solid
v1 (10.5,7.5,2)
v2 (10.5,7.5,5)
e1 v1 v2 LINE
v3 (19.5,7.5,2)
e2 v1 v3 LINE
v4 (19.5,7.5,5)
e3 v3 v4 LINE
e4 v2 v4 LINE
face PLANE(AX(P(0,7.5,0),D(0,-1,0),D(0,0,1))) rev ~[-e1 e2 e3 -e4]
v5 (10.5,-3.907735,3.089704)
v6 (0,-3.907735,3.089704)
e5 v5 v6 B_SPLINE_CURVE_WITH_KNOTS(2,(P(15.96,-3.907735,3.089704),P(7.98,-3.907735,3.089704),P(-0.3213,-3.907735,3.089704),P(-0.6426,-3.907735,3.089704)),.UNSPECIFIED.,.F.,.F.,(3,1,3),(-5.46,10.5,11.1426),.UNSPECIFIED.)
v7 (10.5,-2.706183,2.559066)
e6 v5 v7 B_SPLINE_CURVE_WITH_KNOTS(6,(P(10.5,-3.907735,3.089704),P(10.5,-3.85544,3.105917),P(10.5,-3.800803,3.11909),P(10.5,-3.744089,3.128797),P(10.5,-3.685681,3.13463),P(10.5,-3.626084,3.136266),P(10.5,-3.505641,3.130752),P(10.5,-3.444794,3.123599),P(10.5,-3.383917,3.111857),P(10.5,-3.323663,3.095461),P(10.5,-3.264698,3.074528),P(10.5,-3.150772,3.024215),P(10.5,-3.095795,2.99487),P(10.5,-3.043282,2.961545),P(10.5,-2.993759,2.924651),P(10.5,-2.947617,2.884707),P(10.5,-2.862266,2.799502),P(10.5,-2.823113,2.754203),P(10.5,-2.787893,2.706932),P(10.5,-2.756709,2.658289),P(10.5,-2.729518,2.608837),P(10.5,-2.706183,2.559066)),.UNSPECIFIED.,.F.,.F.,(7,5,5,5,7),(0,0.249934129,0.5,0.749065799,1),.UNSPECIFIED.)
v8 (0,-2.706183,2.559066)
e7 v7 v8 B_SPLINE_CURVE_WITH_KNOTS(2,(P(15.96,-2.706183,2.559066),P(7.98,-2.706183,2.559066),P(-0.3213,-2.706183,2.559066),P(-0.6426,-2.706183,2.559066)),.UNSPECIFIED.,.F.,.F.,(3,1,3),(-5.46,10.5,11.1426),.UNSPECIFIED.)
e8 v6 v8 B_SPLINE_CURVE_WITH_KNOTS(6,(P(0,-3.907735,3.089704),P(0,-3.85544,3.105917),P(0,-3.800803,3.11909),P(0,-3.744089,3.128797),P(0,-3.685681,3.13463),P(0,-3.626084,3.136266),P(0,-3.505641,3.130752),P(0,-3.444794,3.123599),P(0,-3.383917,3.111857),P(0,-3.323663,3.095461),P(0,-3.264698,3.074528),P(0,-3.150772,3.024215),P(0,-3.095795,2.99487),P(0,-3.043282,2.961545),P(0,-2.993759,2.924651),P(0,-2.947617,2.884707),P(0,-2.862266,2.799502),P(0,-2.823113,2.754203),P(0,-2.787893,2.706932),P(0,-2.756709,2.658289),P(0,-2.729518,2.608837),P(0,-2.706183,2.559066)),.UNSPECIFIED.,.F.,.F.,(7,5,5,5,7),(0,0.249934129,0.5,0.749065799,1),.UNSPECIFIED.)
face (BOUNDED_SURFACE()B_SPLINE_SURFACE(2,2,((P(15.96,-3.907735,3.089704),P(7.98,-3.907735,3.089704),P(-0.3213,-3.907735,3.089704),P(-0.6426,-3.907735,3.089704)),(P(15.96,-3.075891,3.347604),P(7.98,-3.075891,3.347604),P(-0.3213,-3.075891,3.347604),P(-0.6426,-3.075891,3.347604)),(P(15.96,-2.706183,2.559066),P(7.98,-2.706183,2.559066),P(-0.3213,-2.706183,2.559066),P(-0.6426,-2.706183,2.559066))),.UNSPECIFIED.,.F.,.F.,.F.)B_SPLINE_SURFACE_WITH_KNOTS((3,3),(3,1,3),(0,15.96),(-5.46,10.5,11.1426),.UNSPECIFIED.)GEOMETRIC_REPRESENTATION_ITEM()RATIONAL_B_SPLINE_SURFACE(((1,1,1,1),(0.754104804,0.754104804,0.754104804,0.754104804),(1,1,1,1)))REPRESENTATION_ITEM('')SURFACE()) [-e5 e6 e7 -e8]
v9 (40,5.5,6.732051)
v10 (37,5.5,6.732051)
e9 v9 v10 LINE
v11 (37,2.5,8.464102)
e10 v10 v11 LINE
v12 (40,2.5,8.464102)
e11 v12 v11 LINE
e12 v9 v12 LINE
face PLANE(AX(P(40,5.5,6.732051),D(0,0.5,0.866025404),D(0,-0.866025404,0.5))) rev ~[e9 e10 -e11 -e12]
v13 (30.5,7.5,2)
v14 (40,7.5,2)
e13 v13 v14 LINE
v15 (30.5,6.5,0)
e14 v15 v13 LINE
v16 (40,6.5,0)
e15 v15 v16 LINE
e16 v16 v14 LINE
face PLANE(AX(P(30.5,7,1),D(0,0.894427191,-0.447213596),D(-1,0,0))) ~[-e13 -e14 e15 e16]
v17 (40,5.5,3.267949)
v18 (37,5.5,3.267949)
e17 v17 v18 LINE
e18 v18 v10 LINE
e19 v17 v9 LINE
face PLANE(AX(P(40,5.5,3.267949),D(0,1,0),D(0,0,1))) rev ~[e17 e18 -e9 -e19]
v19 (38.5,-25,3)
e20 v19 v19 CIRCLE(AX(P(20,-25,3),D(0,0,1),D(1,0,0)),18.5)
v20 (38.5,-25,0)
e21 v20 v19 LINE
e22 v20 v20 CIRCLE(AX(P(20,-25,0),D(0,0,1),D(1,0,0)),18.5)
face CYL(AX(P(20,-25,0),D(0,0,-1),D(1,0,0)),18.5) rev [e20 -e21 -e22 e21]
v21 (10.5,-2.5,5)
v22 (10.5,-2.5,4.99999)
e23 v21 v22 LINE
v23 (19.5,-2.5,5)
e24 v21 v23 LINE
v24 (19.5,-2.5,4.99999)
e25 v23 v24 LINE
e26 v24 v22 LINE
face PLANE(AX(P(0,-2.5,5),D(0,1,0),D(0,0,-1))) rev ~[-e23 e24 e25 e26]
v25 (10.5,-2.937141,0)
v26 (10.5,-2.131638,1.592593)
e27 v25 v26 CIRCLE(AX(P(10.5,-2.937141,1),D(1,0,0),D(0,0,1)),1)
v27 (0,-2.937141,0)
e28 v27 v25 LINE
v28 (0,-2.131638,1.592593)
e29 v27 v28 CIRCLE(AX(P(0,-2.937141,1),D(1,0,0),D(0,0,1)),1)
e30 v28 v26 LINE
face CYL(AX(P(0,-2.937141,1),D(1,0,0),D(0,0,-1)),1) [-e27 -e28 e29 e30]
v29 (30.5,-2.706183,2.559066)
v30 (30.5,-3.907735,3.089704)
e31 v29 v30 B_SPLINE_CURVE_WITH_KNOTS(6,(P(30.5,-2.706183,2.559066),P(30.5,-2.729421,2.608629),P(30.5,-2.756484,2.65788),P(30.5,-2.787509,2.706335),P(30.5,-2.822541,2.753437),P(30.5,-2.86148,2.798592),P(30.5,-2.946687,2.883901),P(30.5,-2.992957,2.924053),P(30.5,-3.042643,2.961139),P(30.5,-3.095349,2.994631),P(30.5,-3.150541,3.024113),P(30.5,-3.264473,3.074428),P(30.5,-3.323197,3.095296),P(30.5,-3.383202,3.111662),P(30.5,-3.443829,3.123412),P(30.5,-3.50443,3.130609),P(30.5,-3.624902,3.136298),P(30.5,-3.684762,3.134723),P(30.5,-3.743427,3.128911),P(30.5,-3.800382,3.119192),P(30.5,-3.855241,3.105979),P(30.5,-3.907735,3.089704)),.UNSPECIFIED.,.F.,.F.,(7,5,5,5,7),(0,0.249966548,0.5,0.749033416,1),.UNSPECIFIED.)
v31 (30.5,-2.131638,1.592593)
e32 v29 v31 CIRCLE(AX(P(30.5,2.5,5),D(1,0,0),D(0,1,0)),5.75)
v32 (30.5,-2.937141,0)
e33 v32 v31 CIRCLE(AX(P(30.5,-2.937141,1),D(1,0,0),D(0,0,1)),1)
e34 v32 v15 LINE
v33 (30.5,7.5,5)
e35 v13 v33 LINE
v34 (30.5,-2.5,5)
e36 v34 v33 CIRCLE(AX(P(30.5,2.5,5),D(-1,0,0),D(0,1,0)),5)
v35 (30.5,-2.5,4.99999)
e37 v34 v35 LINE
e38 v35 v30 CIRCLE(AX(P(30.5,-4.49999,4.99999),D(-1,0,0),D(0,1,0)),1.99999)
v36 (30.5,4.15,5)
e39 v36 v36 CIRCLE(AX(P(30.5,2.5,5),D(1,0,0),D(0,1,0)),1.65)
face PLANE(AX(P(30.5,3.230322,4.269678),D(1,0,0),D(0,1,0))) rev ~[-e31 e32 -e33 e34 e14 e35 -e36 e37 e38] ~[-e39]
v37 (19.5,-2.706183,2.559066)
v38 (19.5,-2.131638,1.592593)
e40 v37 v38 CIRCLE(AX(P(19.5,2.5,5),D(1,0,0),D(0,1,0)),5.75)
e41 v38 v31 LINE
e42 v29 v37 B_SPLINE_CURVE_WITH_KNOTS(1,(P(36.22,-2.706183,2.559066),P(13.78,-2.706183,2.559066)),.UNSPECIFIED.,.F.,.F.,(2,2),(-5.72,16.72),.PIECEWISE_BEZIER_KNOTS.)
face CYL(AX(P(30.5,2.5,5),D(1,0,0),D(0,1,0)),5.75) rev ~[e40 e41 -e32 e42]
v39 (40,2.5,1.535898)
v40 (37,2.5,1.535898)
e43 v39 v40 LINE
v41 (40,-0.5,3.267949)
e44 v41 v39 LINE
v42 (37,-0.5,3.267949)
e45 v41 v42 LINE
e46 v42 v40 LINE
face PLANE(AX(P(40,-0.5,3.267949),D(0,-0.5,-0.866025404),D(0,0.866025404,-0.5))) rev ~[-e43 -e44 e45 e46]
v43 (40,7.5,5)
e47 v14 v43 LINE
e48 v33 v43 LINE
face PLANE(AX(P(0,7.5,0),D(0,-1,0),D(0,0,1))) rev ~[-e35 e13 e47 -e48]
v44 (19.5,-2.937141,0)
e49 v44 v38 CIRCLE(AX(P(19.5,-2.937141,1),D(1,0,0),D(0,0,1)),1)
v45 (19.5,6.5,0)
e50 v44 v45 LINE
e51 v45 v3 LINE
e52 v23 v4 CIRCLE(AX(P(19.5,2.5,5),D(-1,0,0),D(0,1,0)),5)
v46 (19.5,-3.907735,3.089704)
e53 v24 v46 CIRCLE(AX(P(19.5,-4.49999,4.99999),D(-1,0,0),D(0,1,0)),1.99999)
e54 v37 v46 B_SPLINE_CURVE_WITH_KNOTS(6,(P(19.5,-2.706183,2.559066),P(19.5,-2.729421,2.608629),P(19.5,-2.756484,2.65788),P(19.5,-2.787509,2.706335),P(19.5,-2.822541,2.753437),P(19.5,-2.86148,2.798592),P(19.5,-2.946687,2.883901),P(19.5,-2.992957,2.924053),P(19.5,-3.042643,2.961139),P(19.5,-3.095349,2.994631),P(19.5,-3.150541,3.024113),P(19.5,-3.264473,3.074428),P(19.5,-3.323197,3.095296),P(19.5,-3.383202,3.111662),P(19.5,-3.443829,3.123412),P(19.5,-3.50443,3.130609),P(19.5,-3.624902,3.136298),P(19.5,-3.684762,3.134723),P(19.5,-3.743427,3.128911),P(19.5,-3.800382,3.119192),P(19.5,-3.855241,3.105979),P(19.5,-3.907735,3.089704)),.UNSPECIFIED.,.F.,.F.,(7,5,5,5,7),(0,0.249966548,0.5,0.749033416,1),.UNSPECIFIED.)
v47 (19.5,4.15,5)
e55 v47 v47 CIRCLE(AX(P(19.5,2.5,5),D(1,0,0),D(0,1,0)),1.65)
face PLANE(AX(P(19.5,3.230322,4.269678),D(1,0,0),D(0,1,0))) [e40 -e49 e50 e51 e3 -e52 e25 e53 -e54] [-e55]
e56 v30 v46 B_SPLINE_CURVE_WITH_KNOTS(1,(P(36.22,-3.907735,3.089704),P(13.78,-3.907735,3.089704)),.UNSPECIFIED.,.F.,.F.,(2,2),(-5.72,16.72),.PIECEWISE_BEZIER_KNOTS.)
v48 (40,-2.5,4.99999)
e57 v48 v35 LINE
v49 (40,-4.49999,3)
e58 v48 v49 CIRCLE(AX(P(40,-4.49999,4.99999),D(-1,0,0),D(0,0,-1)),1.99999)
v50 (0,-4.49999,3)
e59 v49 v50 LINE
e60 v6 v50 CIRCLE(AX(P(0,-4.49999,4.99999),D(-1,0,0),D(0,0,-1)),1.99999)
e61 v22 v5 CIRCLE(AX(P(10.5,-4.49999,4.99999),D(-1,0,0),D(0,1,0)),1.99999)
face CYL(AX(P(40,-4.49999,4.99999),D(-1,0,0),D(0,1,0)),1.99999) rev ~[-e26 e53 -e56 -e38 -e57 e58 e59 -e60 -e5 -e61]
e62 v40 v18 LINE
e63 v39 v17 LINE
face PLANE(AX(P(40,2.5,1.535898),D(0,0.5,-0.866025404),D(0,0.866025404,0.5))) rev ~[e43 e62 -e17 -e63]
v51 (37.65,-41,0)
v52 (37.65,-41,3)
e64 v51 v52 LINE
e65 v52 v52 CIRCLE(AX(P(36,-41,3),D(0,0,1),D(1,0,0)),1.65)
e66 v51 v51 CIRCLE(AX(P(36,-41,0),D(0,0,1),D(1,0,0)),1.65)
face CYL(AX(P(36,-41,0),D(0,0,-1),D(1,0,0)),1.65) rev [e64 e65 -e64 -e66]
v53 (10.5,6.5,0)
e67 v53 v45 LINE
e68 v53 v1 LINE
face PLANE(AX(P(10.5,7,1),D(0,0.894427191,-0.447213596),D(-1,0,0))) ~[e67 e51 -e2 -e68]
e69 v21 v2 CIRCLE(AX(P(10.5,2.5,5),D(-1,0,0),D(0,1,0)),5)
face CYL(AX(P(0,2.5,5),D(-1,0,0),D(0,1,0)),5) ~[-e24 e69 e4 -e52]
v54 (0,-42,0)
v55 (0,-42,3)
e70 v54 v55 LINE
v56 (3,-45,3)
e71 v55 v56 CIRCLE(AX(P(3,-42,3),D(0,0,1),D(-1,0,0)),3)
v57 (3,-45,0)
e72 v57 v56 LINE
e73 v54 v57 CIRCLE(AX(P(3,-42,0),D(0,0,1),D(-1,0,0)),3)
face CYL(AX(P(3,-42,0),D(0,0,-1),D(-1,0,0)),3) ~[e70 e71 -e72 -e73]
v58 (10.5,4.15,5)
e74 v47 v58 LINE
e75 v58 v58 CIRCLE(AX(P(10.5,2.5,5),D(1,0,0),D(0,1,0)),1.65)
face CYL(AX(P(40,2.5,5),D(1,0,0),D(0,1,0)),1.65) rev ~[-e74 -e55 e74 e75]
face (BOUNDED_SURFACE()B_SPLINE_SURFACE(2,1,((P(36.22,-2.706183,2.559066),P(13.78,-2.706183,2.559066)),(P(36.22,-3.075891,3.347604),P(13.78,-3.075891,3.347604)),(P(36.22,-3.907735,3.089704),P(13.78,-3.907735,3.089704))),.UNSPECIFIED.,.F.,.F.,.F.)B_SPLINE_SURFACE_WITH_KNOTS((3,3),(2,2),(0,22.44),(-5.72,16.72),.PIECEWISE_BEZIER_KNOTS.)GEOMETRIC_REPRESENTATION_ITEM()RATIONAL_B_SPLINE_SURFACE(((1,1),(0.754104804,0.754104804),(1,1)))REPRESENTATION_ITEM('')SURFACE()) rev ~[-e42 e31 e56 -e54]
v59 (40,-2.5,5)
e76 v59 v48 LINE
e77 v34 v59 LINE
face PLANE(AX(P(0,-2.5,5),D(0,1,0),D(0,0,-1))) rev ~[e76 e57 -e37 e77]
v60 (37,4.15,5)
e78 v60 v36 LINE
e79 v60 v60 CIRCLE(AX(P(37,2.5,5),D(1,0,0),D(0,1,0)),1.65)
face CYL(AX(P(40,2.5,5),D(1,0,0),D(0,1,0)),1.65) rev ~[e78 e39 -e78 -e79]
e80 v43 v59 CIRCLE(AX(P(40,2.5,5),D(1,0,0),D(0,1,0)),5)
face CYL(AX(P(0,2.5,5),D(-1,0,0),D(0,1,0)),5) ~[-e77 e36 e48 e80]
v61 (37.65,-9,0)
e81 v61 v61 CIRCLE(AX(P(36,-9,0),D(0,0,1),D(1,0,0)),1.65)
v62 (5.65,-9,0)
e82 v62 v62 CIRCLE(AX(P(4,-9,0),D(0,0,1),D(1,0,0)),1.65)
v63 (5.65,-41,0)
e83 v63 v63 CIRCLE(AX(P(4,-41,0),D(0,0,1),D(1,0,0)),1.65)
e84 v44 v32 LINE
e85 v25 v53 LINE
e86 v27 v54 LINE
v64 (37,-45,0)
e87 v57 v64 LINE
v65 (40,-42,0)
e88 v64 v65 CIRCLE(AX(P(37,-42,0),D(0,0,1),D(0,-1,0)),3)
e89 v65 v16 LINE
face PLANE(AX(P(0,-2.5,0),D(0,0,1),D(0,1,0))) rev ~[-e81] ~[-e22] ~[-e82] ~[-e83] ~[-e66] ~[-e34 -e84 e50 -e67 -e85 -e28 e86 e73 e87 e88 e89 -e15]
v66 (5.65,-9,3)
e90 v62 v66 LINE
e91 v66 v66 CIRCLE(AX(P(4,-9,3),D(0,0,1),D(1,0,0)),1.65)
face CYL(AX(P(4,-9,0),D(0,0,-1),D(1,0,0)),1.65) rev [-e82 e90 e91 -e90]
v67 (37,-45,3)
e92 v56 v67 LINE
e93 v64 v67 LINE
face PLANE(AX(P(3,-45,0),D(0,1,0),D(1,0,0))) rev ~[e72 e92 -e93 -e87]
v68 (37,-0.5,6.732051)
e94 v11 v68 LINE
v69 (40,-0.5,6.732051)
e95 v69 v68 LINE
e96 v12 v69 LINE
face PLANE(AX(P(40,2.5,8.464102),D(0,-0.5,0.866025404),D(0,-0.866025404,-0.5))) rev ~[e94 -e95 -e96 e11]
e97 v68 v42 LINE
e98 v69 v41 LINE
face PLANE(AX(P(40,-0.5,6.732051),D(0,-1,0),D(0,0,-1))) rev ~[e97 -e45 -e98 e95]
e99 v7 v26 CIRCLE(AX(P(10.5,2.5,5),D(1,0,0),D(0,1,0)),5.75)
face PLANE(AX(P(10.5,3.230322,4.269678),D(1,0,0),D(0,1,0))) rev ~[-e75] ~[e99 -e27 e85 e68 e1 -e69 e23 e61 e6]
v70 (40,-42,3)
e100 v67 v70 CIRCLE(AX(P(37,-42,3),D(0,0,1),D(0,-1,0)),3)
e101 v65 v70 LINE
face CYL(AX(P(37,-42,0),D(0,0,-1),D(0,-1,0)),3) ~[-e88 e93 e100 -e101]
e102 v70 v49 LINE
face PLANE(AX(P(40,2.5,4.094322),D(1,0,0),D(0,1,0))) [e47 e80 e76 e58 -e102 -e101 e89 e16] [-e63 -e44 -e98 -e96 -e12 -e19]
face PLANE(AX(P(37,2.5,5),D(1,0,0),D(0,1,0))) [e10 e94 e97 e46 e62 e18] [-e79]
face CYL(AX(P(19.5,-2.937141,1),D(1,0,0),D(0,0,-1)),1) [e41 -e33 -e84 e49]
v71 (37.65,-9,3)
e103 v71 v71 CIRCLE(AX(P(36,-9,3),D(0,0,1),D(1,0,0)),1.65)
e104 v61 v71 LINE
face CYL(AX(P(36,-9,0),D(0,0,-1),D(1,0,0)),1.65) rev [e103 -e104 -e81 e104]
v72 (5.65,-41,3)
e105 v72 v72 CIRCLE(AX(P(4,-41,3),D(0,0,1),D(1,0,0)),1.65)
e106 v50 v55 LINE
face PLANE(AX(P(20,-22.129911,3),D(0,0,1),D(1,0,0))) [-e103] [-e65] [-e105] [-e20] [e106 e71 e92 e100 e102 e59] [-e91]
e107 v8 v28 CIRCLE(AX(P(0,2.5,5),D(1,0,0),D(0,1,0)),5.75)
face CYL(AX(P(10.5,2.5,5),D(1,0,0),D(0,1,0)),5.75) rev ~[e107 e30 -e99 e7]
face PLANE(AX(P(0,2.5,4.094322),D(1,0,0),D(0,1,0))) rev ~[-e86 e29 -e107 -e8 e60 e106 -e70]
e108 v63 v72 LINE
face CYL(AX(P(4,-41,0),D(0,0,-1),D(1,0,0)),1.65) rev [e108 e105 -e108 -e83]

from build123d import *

# Parameters (mm, degrees)
F0_R      = 1.65
F0_R_2    = 18.5
F1_DEPTH  = 3
F3_DEPTH  = 40
F4_R      = 1.65
F5_DEPTH  = 40.001
F7_DEPTH  = 3
F8_R      = 1.99999
F11_DEPTH = 11
F14_DEPTH = 10.501
F15_SIZE2 = 2
F15_SIZE  = 1
F16_R     = 1


# Not quite as in the source:
# - a fillet or chamfer is up to 0.001 mm smaller than in the source, because OpenCascade refuses the exact size


with BuildPart() as f1:
    # F0 (on Top) → F1 (new body)
    with BuildSketch(Plane.XY):
        with BuildLine():
            Line((40, 0), (0, 0))
            Line((0, 0), (0, -42))
            ThreePointArc((0, -42), (0.8786796564, -44.1213203436), (3, -45))
            Line((3, -45), (37, -45))
            ThreePointArc((37, -45), (39.1213203436, -44.1213203436), (40, -42))
            Line((40, -42), (40, 0))
        make_face()
        with Locations((4, -41)):
            Circle(F0_R, mode=Mode.SUBTRACT)
        with Locations((36, -41)):
            Circle(F0_R, mode=Mode.SUBTRACT)
        with Locations((20, -25)):
            Circle(F0_R_2, mode=Mode.SUBTRACT)
        with Locations((4, -9)):
            Circle(F0_R, mode=Mode.SUBTRACT)
        with Locations((36, -9)):
            Circle(F0_R, mode=Mode.SUBTRACT)
    extrude(amount=F1_DEPTH)

    # F2 (on Right) → F3 (join)
    with BuildSketch(Plane.YZ):
        with BuildLine():
            Line((-2.5, 5), (-2.5, 0))
            Line((-2.5, 0), (7.5, 0))
            Line((7.5, 0), (7.5, 5))
            ThreePointArc((7.5, 5), (2.5, 10), (-2.5, 5))
        make_face()
    extrude(amount=F3_DEPTH)

    # F4 (on face) → F5 (cut, through all)
    with BuildSketch(Plane.YZ.offset(40)):
        with Locations((2.5, 5)):
            Circle(F4_R)
    extrude(amount=-F5_DEPTH, mode=Mode.SUBTRACT)

    # F6 (on face) → F7 (cut)
    with BuildSketch(Plane.YZ.offset(40)):
        Polygon((5.5, 3.2679491924), (5.5, 6.7320508076), (2.5, 8.4641016151), (-0.5, 6.7320508076), (-0.5, 3.2679491924), (2.5, 1.5358983849), align=None)
    extrude(amount=-F7_DEPTH, mode=Mode.SUBTRACT)

    # F8 (radius 2 in the source; OpenCascade refuses exactly that, so slightly less here)
    f8_edges = [f1.edges().sort_by_distance(p)[0] for p in [
        (20, -2.5, 3),
    ]]
    fillet(f8_edges, radius=F8_R)

    # F10 (on offset) → F11 (cut)
    with BuildSketch(Plane.YZ.offset(30.5)):
        with BuildLine():
            Line((8.25, -0.75), (8.25, 5))
            ThreePointArc((8.25, 5), (-1.5658639918, 9.0658639918), (2.5, -0.75))
            Line((2.5, -0.75), (8.25, -0.75))
        make_face()
    extrude(amount=-F11_DEPTH, mode=Mode.SUBTRACT)

    # F13 (on offset) → F14 (cut, through all)
    with BuildSketch(Plane.YZ.offset(10.5)):
        with BuildLine():
            Line((8.25, -0.75), (8.25, 5))
            ThreePointArc((8.25, 5), (-1.5658639918, 9.0658639918), (2.5, -0.75))
            Line((2.5, -0.75), (8.25, -0.75))
        make_face()
    extrude(amount=-F14_DEPTH, mode=Mode.SUBTRACT)

    # F15
    f15_edges = [f1.edges().sort_by_distance(p)[0] for p in [
        (35.25, 7.5, 0),
        (15, 7.5, 0),
    ]]
    f15_side = f1.faces().sort_by_distance((15, 6.839981, 0))[0]
    chamfer(f15_edges, length=F15_SIZE, length2=F15_SIZE2, reference=f15_side)

    # F16
    f16_edges = [f1.edges().sort_by_distance(p)[0] for p in [
        (25, -3.075892, 3.595745),
        (25, -0.339454, 0),
        (5.25, -3.075892, 3.595745),
        (5.25, -0.339454, 0),
    ]]
    fillet(f16_edges, radius=F16_R)


solid = f1.part
